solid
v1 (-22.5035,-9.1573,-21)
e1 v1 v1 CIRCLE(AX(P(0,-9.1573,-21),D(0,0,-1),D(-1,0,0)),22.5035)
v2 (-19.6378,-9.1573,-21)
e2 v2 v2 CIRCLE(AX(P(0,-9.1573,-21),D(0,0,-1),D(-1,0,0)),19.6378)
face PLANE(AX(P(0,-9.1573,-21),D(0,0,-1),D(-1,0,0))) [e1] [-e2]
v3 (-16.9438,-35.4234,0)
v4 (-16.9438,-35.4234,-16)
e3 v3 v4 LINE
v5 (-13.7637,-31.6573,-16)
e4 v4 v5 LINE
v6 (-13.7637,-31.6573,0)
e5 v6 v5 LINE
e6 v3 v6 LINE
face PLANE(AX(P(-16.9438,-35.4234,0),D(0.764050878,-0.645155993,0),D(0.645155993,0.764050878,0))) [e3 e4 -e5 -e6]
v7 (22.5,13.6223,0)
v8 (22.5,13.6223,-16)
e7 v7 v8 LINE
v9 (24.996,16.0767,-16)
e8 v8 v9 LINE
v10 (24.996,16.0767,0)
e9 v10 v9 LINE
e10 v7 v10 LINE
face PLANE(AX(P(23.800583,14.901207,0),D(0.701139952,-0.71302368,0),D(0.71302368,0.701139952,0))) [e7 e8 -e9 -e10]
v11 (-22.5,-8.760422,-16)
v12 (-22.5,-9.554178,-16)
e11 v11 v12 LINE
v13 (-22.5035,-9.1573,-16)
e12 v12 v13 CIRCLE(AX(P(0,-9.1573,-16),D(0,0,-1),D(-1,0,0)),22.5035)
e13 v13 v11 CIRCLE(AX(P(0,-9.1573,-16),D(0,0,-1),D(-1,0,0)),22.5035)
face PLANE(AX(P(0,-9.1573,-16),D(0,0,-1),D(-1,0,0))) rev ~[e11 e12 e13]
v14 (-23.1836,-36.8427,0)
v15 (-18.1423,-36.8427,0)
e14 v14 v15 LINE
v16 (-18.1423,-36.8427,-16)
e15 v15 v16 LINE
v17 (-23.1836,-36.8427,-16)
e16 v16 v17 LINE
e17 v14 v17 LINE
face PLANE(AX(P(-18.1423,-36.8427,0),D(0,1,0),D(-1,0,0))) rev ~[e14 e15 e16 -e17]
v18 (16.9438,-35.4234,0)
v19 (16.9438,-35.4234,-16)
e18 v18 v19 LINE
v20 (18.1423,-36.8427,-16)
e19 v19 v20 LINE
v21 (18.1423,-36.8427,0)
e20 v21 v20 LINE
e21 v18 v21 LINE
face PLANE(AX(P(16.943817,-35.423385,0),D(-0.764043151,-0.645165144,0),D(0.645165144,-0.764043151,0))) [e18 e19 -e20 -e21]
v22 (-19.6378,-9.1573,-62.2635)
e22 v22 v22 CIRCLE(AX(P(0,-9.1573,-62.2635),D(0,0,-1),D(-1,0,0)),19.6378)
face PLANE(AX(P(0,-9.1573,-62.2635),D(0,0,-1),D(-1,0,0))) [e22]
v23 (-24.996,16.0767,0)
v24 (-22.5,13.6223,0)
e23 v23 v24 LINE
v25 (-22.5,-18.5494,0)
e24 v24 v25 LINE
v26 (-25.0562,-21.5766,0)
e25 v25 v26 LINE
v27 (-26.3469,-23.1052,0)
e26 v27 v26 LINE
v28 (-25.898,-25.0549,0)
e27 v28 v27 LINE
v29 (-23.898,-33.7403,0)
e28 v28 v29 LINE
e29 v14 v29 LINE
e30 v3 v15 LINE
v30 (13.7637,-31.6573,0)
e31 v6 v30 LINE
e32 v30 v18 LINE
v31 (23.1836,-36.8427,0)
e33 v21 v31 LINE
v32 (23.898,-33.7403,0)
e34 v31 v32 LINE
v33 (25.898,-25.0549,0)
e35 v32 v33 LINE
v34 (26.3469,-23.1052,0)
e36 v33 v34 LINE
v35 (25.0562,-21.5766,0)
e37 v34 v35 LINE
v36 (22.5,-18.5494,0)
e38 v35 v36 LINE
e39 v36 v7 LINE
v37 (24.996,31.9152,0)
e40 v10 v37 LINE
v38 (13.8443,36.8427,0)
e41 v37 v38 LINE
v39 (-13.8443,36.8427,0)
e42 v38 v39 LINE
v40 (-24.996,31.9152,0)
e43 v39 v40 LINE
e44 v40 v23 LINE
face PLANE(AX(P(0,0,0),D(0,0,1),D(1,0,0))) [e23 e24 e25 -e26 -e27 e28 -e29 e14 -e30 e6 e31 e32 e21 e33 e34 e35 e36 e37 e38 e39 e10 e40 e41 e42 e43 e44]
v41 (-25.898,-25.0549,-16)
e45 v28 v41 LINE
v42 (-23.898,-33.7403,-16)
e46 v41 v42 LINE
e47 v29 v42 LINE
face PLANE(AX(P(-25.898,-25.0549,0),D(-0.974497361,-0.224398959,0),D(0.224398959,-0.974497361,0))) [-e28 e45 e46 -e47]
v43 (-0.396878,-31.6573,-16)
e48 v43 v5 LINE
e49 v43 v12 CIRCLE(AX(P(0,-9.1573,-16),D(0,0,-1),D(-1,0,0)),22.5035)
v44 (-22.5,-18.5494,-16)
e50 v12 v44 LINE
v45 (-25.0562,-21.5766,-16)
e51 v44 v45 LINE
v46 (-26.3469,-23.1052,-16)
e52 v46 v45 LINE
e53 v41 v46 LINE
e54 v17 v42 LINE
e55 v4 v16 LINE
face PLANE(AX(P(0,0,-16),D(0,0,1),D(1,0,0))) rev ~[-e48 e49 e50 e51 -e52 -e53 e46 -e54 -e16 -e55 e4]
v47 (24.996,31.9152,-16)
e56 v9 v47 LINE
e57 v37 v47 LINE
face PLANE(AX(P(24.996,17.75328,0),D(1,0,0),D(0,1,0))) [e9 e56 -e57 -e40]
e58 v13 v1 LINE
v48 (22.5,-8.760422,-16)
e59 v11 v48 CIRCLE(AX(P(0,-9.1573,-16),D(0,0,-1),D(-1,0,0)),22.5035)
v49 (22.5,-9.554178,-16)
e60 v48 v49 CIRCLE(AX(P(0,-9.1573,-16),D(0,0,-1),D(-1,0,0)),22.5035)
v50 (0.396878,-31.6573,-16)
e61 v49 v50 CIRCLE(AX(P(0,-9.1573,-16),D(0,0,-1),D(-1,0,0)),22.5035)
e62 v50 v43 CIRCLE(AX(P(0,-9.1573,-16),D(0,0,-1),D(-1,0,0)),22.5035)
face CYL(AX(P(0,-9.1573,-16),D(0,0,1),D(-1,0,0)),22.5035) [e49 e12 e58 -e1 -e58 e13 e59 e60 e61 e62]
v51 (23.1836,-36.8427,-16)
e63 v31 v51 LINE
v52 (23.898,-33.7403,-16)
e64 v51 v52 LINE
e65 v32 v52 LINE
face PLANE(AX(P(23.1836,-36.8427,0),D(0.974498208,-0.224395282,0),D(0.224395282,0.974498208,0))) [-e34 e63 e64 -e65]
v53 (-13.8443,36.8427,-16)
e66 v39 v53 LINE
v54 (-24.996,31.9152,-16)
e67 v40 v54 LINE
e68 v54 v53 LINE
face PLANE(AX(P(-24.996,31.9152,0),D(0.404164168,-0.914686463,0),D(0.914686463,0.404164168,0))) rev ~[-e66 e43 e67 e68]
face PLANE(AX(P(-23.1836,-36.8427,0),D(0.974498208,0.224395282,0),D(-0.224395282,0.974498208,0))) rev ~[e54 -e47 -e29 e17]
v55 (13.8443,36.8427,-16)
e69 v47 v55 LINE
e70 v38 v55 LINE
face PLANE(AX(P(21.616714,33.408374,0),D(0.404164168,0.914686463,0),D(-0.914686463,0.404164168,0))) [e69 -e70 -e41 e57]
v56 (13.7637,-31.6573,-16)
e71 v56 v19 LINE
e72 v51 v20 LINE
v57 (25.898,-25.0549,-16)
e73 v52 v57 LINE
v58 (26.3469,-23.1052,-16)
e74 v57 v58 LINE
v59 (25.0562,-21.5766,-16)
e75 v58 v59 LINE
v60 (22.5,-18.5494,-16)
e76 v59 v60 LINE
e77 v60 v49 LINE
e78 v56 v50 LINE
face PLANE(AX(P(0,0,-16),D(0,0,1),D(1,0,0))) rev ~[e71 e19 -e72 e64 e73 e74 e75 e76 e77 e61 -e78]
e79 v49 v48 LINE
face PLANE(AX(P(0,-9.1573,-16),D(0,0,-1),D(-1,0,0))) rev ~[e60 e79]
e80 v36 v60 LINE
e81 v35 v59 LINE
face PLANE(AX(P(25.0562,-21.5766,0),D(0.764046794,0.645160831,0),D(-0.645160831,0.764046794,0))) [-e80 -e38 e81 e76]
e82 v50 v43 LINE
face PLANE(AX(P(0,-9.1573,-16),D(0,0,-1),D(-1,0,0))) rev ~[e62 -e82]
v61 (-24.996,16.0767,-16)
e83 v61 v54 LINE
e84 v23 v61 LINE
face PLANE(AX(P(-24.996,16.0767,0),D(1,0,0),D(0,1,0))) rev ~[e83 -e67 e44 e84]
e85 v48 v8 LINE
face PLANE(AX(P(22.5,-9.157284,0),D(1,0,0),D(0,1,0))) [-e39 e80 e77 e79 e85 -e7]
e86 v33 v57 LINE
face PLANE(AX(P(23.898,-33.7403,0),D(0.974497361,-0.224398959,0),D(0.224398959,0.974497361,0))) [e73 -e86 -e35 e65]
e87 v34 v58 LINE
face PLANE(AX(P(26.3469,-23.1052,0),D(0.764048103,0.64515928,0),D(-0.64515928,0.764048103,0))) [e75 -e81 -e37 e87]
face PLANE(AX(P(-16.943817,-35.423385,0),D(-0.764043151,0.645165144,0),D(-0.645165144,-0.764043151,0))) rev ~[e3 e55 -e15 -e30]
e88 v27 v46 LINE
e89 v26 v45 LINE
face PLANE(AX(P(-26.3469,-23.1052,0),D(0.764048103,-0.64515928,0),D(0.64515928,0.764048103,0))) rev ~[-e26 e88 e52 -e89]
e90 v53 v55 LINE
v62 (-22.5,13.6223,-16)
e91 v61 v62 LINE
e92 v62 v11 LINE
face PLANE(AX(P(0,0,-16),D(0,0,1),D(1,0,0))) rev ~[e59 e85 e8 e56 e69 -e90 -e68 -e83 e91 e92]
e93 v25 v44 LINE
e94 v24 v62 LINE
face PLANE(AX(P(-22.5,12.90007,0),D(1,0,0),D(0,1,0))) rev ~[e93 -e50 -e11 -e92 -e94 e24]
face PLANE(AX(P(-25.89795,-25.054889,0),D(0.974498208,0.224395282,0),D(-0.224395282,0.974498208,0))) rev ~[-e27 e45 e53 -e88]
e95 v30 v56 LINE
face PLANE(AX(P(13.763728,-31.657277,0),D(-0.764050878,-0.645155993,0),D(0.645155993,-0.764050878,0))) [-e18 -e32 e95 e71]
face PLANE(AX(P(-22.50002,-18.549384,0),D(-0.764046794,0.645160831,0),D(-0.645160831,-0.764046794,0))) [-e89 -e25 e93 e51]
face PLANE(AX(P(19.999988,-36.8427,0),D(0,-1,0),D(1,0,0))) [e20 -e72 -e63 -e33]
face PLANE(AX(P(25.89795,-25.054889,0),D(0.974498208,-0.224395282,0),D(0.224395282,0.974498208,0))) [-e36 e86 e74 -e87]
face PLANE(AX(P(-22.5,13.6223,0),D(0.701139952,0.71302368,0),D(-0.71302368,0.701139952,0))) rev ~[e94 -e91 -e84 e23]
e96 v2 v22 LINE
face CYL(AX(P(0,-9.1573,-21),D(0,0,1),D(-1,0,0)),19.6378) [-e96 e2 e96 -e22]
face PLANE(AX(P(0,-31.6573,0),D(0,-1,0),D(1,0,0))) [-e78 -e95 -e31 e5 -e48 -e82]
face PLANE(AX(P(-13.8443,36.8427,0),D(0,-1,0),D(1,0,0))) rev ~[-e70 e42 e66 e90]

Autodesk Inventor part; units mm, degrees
ref_plane "YZ Plane" through (0, 0, 0) normal (1, 0, 0) x (0, 1, 0)
ref_plane "Plan de construction1" through (0, 0, 0) normal (0, 0, 1) x (1, 0, 0)
sketch "Esquisse1" plane through (0, 0, 0) normal (0, 0, 1) x (1, 0, 0)
  circle A0 centre (18, -9.1573) radius 3.05 projected
  arc A1 (16.3537, 35.0227) -> (19.3537, 33.6971) centre (18.8691, 36.6577) ccw projected
  arc A2 (16.3537, 35.0227) -> (9.6181, 34.9787) centre (13, 32.8427) ccw projected
  arc A3 (6.0453, 33.7654) -> (9.6181, 34.9787) centre (7.0816, 36.5807) ccw projected
  arc A4 (6.0453, 33.7654) -> (-6.0453, 33.7654) centre (0, 17.3427) ccw projected
  arc A5 (-9.6181, 34.9787) -> (-6.0453, 33.7654) centre (-7.0816, 36.5807) ccw projected
  arc A6 (-9.6181, 34.9787) -> (-16.3537, 35.0227) centre (-13, 32.8427) ccw projected
  arc A7 (-19.3537, 33.6971) -> (-16.3537, 35.0227) centre (-18.8691, 36.6577) ccw projected
  arc A8 (-19.3537, 33.6971) -> (-23.0131, 27.1188) centre (-20, 29.7497) ccw projected
  line L0 (-23.0131, 27.1188) -> (-21.6977, 25.6123) projected
  arc A9 (-21.984, 21.3792) -> (-21.6977, 25.6123) centre (-23.9573, 23.6389) ccw projected
  line L1 (-21.984, 21.3792) -> (-23.6265, 19.9451) projected
  arc A10 (-23.6265, 19.9451) -> (-23.5067, 13.8184) centre (-20.9956, 16.932) ccw projected
  arc A11 (-20.4202, 0.2907) -> (-23.5067, 13.8184) centre (-30.5395, 5.0978) ccw projected
  arc A12 (-20.4202, 0.2907) -> (-21.1202, -16.9153) centre (0, -9.1573) ccw projected
  line L2 (-21.1202, -16.9153) -> (-25.0562, -21.5766) projected
  arc A13 (-25.0562, -21.5766) -> (-25.898, -25.0549) centre (-22, -24.1573) ccw projected
  line L3 (-25.898, -25.0549) -> (-23.898, -33.7403) projected
  arc A14 (-23.898, -33.7403) -> (-16.9438, -35.4234) centre (-20, -32.8427) ccw projected
  line L4 (-16.9438, -35.4234) -> (-12.7634, -30.4726) projected
  arc A15 (-9.2394, -29.6727) -> (-12.7634, -30.4726) centre (-10.4713, -32.4081) ccw projected
  arc A16 (-9.2394, -29.6727) -> (9.2394, -29.6727) centre (0, -9.1573) ccw projected
  arc A17 (12.7634, -30.4726) -> (9.2394, -29.6727) centre (10.4713, -32.4081) ccw projected
  line L5 (12.7634, -30.4726) -> (16.9438, -35.4234) projected
  arc A18 (16.9438, -35.4234) -> (23.898, -33.7403) centre (20, -32.8427) ccw projected
  line L6 (23.898, -33.7403) -> (25.898, -25.0549) projected
  arc A19 (25.898, -25.0549) -> (25.0562, -21.5766) centre (22, -24.1573) ccw projected
  line L7 (25.0562, -21.5766) -> (21.1202, -16.9153) projected
  arc A20 (21.1202, -16.9153) -> (20.477, 0.167) centre (0, -9.1573) ccw projected
  arc A21 (23.6268, 14.7402) -> (20.477, 0.167) centre (31.8353, 5.339) ccw projected
  arc A22 (23.6268, 14.7402) -> (23.507, 20.8669) centre (20.996, 17.7533) ccw projected
  line L8 (23.507, 20.8669) -> (22.4423, 21.7255) projected
  arc A23 (22.0658, 26.0339) -> (22.4423, 21.7255) centre (24.3256, 24.0608) ccw projected
  line L9 (22.0658, 26.0339) -> (23.0131, 27.1188) projected
  arc A24 (23.0131, 27.1188) -> (19.3537, 33.6971) centre (20, 29.7497) ccw projected
  circle A25 centre (13, 32.8427) radius 2 projected
  circle A26 centre (-13, 32.8427) radius 2 projected
  circle A27 centre (-22, -24.1573) radius 2 projected
  circle A28 centre (22, -24.1573) radius 2 projected
  circle A29 centre (-18, -9.1573) radius 3.05 projected
  line L10 (0, -31.6573) -> (13.7637, -31.6573)
  line L11 (13.7637, -31.6573) -> (18.1423, -36.8427)
  line L12 (18.1423, -36.8427) -> (23.1836, -36.8427)
  line L13 (23.1836, -36.8427) -> (26.3469, -23.1052)
  line L14 (26.3469, -23.1052) -> (22.5, -18.5494)
  line L15 (22.5, -18.5494) -> (22.5, 13.6223)
  line L16 (22.5, 13.6223) -> (24.996, 16.0767)
  line L17 (24.996, 16.0767) -> (24.996, 31.9152)
  line L18 (24.996, 31.9152) -> (13.8443, 36.8427)
  line L19 (13.8443, 36.8427) -> (0, 36.8427)
  line L20 (0, 0) -> (0, -45.3526)
  line L21 (0, -31.6573) -> (-13.7637, -31.6573)
  line L22 (-13.7637, -31.6573) -> (-18.1423, -36.8427)
  line L23 (-18.1423, -36.8427) -> (-23.1836, -36.8427)
  line L24 (-23.1836, -36.8427) -> (-26.3469, -23.1052)
  line L25 (-26.3469, -23.1052) -> (-22.5, -18.5494)
  line L26 (-22.5, -18.5494) -> (-22.5, 13.6223)
  line L27 (-22.5, 13.6223) -> (-24.996, 16.0767)
  line L28 (-24.996, 16.0767) -> (-24.996, 31.9152)
  line L29 (-24.996, 31.9152) -> (-13.8443, 36.8427)
  line L30 (-13.8443, 36.8427) -> (0, 36.8427)
  point P0 (23.898, -33.7403)
ref_plane "Plan de construction2" through (-24.996, -18.6052, -16) normal (0, 0, -1) x (0, 1, 0)
extrude "Extrusion1" add sketch "Esquisse1" against normal up to surface (16 mm away) contours A0 | A2 L18 A24 A1 | A1 A24 L9 A23 L8 A22 A21 A20 L7 A19 L6 A18 L5 A17 A16 A15 L4 A14 L3 A13 L2 A12 A11 L26 L27 A10 L1 A9 L0 A8 A7 A6 A5 A4 A3 A2 | A2 L19 L18 | L18 L17 A22 L8 A23 L9 A24 | A2 A3 A4 A5 A6 L30 L19 | L17 L16 A22 | A6 L29 L30 | L16 A21 A22 | A6 A7 A8 L29 | L15 A20 A21 | A8 L0 A9 L1 A10 L28 L29 | L15 L7 A20 | A10 L27 L28 | L14 L13 A19 | L13 L12 A18 | A11 A12 L26 | L12 L11 A18 | A12 L2 L26 | L10 A16 A17 L5 | A13 L24 L25 | L21 L4 A15 A16 | A14 L23 L24 | L22 L23 A14 | A25 | A26 | A27 | A28 | A29
sketch "Esquisse2" plane through (0, -9.1573, -16) normal (0, 0, -1) x (-1, 0, 0)
  circle A0 centre (0, 0) radius 22.5035
  point P0 (0, 9.1573)
ref_plane "Plan de construction3" through (-23.77, -32.9273, -21) normal (0, 0, -1) x (0, 1, 0)
extrude "Extrusion2" add sketch "Esquisse2" along normal up to surface (5 mm away)
sketch "Esquisse3" plane through (0, -9.1573, -21) normal (0, 0, -1) x (-1, 0, 0)
  circle A0 centre (0, 0) radius 19.6378
  point P0 (0, 9.1573)
extrude "Extrusion3" add sketch "Esquisse3" along normal up to surface (41.2635 mm away)
properties part number "simple_lidar_shape"
